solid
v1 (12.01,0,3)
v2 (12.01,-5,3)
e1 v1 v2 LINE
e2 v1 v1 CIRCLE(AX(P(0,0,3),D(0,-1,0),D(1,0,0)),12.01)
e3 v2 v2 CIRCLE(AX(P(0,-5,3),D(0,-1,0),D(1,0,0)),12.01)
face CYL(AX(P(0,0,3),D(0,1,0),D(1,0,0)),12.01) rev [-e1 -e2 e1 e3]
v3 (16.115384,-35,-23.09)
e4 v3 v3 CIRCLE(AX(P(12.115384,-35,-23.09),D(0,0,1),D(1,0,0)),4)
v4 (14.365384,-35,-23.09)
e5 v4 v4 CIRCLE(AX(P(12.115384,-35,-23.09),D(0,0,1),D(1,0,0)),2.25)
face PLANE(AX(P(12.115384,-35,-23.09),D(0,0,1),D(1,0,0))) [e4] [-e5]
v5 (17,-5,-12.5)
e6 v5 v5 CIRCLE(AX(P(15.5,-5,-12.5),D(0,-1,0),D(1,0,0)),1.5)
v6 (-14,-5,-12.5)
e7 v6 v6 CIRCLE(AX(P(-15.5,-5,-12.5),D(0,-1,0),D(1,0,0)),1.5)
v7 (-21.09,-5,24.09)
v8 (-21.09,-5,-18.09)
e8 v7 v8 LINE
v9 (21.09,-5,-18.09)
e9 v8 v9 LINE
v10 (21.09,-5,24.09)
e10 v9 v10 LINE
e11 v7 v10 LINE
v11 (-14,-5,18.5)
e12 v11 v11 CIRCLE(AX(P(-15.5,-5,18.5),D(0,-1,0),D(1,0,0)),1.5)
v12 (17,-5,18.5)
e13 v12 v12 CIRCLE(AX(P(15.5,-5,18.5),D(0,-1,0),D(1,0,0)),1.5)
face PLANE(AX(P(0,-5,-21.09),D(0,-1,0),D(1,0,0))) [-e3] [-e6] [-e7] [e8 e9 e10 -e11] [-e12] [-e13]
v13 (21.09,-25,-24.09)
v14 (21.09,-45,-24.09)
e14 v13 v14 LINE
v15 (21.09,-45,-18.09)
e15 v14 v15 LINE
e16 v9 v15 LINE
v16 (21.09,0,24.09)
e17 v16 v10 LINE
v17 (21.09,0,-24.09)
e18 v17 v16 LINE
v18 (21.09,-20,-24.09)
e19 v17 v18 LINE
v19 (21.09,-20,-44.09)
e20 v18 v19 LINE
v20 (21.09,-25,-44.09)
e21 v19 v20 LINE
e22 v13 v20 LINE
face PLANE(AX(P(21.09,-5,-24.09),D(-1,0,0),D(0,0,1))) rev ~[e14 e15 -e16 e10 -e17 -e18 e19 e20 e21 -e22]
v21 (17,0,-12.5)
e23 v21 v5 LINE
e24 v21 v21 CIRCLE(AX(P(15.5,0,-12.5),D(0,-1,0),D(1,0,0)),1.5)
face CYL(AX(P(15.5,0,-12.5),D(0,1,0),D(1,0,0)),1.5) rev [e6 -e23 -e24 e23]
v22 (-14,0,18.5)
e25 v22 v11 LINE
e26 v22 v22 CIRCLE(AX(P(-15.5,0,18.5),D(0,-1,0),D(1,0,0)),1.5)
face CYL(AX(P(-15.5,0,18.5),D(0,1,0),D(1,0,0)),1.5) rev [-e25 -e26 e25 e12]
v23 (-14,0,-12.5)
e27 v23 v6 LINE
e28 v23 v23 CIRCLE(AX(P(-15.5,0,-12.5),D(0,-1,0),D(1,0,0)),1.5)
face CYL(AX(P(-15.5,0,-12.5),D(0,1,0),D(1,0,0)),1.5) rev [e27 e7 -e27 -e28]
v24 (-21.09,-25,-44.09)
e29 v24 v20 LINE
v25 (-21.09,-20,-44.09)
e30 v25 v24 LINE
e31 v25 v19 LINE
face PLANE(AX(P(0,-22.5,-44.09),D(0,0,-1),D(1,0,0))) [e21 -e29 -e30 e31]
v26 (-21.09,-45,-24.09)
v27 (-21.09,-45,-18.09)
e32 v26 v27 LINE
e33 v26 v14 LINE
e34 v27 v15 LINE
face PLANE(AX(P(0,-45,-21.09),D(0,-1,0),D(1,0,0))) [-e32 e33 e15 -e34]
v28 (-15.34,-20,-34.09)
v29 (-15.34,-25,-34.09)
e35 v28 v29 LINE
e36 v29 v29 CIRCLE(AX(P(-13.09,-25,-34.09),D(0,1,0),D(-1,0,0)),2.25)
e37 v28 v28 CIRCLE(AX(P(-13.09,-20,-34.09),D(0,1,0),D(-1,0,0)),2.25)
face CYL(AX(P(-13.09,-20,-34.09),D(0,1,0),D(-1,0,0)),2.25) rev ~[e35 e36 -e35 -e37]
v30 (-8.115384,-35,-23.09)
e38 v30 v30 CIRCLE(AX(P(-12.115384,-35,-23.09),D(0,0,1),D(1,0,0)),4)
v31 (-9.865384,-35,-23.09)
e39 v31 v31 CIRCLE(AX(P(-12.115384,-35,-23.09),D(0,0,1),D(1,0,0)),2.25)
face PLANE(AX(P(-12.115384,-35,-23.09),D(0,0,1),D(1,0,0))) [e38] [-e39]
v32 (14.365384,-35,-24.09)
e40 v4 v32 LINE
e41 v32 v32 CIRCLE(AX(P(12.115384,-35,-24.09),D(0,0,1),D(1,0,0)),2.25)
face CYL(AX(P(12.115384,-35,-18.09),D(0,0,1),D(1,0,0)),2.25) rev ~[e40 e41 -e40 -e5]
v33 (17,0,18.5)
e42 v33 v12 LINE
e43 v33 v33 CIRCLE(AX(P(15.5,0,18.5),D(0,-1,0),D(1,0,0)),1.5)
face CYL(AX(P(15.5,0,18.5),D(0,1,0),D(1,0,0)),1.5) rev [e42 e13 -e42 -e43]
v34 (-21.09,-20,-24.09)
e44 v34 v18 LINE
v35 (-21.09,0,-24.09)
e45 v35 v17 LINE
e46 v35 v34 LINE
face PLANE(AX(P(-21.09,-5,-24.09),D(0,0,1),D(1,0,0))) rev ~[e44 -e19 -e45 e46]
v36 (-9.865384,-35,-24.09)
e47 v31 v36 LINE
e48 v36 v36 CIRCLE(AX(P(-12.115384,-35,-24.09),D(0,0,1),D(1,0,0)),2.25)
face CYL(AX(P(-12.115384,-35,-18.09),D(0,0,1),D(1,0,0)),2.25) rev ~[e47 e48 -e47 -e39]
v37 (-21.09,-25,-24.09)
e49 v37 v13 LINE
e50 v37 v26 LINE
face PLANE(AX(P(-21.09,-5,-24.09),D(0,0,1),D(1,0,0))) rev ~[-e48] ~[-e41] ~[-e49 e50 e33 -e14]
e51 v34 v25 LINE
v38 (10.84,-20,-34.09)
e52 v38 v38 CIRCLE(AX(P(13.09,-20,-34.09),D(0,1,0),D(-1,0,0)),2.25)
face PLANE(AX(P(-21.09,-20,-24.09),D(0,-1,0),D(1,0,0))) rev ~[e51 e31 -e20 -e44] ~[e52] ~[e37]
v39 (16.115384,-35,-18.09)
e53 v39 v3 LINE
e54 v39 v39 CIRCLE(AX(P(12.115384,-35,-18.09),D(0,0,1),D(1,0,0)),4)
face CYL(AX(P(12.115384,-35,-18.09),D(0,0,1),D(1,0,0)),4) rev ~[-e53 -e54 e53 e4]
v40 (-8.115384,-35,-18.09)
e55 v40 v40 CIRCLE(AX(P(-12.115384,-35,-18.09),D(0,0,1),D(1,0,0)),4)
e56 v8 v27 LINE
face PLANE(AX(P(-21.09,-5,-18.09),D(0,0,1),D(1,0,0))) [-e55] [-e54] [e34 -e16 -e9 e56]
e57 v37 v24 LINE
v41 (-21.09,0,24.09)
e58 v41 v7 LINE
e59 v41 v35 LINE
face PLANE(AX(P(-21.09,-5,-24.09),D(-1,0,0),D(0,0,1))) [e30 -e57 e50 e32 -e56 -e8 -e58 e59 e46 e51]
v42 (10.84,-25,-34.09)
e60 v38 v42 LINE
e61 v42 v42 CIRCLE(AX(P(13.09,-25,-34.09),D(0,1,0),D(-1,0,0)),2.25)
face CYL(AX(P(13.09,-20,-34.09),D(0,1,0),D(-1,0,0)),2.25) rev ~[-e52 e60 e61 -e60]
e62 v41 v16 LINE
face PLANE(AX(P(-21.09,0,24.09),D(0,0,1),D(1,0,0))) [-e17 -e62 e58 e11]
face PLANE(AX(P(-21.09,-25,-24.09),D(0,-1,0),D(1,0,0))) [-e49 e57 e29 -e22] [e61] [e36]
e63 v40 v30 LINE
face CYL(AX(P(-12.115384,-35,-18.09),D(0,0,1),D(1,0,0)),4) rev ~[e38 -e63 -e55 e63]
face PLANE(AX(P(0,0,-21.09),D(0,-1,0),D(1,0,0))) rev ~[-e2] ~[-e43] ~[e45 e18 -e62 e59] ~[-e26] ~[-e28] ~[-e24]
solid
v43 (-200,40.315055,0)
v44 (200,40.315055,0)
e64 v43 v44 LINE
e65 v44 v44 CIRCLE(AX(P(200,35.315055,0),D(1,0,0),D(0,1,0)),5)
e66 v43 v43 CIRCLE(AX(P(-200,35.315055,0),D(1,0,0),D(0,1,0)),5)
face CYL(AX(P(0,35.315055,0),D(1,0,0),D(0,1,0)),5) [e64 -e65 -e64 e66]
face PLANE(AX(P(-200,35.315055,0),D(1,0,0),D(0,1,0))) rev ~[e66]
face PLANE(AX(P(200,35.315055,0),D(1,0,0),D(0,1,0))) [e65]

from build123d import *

# Parameters (mm, degrees)
F0_W      = 42.18
F0_H      = 6
F0_H_2    = 42.18
F0_R      = 1.5
F0_R_2    = 12.01
F1_DEPTH  = 5
F2_W      = 42.18
F2_H      = 6
F3_DEPTH  = 40
F4_R      = 2.25
F5_DEPTH  = 6
F6_R      = 4
F6_R_2    = 2.25
F7_DEPTH  = 5
F8_W      = 42.18
F8_H      = 5
F9_DEPTH  = 20
F10_R     = 2.25
F11_DEPTH = 5
F12_R     = 5
F13_DEPTH = 200


# Not quite as in the source:
# - a feature names something its author has since deleted; it is built from what else it names


with BuildPart() as f1:
    # F0 (on Front) → F1 (new body)
    with BuildSketch(Plane.XZ):
        with Locations((0, -21.09)):
            Rectangle(F0_W, F0_H)
        with Locations((0, 3)):
            Rectangle(F0_W, F0_H_2)
        with Locations((-15.5, -12.5)):
            Circle(F0_R, mode=Mode.SUBTRACT)
        with Locations((15.5, -12.5)):
            Circle(F0_R, mode=Mode.SUBTRACT)
        with Locations((-15.5, 18.5)):
            Circle(F0_R, mode=Mode.SUBTRACT)
        with Locations((0, 3)):
            Circle(F0_R_2, mode=Mode.SUBTRACT)
        with Locations((15.5, 18.5)):
            Circle(F0_R, mode=Mode.SUBTRACT)
    extrude(amount=F1_DEPTH)

    # F2 (on face) → F3 (join)
    with BuildSketch(Plane.XZ.offset(5)):
        with Locations((0, -21.09)):
            Rectangle(F2_W, F2_H)
    extrude(amount=F3_DEPTH)

    # F4 (on face) → F5 (cut, through all)
    with BuildSketch(Plane.XY.offset(-18.09)):
        with Locations((-12.115384452, -35)):
            Circle(F4_R)
        with Locations((12.115384452, -35)):
            Circle(F4_R)
    extrude(amount=-F5_DEPTH, mode=Mode.SUBTRACT)

    # F6 (on face) → F7 (cut)
    with BuildSketch(Plane.XY.offset(-18.09)):
        with Locations((-12.115384452, -35)):
            Circle(F6_R)
        with Locations((-12.115384452, -35)):
            Circle(F6_R_2, mode=Mode.SUBTRACT)
        with Locations((12.115384452, -35)):
            Circle(F6_R)
        with Locations((12.115384452, -35)):
            Circle(F6_R_2, mode=Mode.SUBTRACT)
    extrude(amount=-F7_DEPTH, mode=Mode.SUBTRACT)

    # F8 (on face) → F9 (join)
    with BuildSketch(Plane(origin=(0, 0, -24.09), x_dir=(1, 0, 0), z_dir=(0, 0, -1))):
        with Locations((0, 22.5)):
            Rectangle(F8_W, F8_H)
    extrude(amount=F9_DEPTH)

    # F10 (on face) → F11 (cut, through all)
    with BuildSketch(Plane(origin=(0, -20, 0), x_dir=(-1, 0, 0), z_dir=(0, 1, 0))):
        with Locations((13.09, -34.09)):
            Circle(F10_R)
        with Locations((-13.09, -34.09)):
            Circle(F10_R)
    extrude(amount=-F11_DEPTH, mode=Mode.SUBTRACT)


with BuildPart() as f13:
    # F12 (on Right) → F13 (new body, symmetric)
    with BuildSketch(Plane.YZ):
        with Locations((35.3150554001, 0)):
            Circle(F12_R)
    extrude(amount=F13_DEPTH, both=True)


solid = Compound([f1.part, f13.part])
